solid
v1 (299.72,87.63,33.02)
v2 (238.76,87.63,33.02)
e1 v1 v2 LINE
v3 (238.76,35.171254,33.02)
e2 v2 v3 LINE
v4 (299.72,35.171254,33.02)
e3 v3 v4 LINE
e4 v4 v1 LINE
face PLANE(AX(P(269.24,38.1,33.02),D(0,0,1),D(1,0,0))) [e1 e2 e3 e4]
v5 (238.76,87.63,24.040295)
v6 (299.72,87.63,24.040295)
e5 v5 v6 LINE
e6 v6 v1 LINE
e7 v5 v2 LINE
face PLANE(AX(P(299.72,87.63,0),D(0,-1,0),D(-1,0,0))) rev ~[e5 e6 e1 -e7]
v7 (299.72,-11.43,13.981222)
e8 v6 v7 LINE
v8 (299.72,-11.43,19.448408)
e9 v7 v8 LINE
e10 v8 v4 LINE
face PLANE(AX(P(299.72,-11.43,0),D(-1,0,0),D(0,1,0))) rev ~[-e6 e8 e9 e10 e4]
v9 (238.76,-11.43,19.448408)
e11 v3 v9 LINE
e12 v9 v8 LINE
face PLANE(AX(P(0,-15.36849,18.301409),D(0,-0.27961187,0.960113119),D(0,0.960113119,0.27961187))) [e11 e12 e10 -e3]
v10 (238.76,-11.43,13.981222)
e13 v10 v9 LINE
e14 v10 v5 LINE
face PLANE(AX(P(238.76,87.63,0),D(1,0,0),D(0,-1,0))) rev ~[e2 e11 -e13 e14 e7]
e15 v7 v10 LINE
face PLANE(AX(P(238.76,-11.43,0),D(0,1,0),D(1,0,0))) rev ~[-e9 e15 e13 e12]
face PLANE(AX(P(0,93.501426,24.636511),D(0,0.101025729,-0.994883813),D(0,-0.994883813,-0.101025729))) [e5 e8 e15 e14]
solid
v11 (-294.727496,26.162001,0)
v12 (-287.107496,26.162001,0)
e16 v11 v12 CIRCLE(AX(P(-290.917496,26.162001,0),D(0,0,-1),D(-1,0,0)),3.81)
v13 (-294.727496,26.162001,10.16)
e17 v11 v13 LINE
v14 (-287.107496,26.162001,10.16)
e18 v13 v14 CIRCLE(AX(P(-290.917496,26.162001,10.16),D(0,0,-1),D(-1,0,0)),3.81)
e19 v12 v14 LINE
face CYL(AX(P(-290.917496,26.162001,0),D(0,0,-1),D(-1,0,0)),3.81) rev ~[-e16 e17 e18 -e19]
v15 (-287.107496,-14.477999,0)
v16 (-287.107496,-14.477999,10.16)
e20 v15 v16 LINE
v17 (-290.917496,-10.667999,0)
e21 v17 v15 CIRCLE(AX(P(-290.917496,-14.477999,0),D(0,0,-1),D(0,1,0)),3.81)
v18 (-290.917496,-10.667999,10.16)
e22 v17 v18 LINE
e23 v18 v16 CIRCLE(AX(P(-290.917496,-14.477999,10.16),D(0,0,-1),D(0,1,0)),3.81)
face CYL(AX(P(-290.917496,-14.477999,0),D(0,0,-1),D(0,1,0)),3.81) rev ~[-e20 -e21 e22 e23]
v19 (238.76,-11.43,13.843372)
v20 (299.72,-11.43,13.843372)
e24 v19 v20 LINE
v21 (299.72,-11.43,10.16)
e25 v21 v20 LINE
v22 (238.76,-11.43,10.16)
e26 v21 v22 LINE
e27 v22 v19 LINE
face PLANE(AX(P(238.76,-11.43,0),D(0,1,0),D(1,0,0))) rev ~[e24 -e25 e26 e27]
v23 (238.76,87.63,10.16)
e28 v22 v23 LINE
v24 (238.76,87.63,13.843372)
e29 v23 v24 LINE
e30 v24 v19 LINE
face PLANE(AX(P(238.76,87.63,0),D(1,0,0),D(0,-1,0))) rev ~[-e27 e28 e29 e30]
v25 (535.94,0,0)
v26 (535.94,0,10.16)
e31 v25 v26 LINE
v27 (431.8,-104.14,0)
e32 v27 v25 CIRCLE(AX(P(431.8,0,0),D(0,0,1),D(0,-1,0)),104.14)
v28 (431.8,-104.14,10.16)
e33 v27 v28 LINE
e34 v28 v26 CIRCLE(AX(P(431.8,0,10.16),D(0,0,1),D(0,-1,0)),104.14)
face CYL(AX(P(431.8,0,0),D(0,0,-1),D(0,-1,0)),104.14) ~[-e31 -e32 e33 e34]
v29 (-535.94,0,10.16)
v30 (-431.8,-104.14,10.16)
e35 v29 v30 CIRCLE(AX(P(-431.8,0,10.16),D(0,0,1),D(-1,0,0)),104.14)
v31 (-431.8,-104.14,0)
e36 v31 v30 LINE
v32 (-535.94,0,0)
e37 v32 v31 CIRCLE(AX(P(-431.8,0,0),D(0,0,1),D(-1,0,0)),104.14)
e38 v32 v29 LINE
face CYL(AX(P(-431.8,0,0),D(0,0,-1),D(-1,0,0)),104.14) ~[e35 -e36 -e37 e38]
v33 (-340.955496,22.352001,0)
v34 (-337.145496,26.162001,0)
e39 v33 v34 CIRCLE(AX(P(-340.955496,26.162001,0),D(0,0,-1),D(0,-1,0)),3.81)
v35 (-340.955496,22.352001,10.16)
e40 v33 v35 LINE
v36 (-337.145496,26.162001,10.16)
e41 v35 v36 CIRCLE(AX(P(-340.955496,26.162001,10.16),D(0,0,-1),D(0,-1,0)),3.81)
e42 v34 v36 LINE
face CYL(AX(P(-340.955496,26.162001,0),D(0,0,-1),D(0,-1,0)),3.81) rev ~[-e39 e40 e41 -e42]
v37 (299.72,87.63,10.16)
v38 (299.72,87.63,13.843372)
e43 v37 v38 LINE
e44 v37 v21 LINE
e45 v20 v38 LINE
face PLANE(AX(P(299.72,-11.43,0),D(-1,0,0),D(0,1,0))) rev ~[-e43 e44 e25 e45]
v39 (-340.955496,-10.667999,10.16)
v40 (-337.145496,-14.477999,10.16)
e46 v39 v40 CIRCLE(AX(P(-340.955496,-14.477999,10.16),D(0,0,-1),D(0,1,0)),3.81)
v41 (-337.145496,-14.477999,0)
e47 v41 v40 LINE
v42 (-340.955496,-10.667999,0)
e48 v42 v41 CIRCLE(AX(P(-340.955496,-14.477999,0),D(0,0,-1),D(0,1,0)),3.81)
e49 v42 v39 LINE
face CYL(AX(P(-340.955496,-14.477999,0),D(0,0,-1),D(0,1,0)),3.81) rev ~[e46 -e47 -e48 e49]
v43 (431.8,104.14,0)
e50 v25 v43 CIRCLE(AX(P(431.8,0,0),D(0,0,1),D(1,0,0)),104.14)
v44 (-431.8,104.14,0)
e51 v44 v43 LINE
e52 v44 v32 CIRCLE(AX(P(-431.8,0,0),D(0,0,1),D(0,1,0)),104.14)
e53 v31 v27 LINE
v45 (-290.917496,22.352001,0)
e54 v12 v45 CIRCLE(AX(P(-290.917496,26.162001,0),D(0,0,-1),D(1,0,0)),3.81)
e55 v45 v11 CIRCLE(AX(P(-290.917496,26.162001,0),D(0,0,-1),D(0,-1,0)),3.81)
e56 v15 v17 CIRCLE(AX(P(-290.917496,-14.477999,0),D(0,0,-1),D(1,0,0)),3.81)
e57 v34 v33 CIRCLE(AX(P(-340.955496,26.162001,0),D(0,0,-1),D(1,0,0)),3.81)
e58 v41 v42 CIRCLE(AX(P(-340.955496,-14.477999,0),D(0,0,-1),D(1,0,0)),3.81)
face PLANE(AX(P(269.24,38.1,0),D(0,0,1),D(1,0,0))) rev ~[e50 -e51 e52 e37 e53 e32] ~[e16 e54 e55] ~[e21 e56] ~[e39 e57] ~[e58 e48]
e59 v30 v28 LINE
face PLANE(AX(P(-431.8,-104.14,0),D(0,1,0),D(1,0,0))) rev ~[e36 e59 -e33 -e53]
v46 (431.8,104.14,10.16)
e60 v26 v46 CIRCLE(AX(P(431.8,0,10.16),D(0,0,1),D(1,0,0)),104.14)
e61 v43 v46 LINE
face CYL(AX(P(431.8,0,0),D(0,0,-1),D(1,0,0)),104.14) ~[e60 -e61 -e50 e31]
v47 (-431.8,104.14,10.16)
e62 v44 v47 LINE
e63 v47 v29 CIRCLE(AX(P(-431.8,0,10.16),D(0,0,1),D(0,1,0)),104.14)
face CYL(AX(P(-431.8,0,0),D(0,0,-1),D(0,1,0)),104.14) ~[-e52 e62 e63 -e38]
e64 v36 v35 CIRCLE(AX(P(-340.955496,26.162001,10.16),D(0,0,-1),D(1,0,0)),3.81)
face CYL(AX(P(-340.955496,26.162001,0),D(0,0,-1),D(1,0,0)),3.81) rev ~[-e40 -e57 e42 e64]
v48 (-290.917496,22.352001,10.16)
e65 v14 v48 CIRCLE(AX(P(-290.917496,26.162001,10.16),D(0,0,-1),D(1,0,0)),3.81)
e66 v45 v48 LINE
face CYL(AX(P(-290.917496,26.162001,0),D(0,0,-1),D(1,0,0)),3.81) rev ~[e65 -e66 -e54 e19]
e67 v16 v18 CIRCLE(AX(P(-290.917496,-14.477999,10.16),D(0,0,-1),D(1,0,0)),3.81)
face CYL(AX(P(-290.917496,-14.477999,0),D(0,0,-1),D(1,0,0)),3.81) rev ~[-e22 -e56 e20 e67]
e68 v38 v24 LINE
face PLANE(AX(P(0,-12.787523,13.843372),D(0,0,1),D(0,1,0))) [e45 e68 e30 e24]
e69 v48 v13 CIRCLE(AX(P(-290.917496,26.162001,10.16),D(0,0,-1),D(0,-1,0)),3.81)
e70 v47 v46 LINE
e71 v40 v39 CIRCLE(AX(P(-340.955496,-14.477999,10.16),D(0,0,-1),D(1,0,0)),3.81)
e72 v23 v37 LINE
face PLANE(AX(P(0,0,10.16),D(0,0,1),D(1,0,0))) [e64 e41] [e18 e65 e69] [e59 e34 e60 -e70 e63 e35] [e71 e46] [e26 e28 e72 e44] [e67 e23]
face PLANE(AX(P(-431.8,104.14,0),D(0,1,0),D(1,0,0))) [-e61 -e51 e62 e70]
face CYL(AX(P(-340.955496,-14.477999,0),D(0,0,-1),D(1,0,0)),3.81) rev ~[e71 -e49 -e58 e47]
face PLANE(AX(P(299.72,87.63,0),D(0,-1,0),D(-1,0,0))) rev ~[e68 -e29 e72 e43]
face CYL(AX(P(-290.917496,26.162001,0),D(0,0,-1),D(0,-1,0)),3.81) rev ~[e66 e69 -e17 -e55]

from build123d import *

# Parameters (mm, degrees)
F0_W     = 863.6
F0_H     = 208.28
F1_DEPTH = 10.16
F3_DEPTH = 33.02
F5_DEPTH = 734.06
F6_DEPTH = 548.64


# Not quite as in the source:
# - a feature names something its author has since deleted; it is built from what else it names


with BuildPart() as f1:
    # F0 (on Top) → F1 (new body)
    with BuildSketch(Plane.XY):
        Rectangle(F0_W, F0_H)
        with BuildLine():
            ThreePointArc((-337.1454958344, -14.4779989496), (-343.6495726707, -17.1720757859), (-340.9554958344, -10.6679989496))
            ThreePointArc((-340.9554958344, -10.6679989496), (-338.261418998, -11.7839221133), (-337.1454958344, -14.4779989496))
        make_face(mode=Mode.SUBTRACT)
        with BuildLine():
            ThreePointArc((-287.1074958344, -14.4779989496), (-293.6115726707, -17.1720757859), (-290.9174958344, -10.6679989496))
            ThreePointArc((-290.9174958344, -10.6679989496), (-288.223418998, -11.7839221133), (-287.1074958344, -14.4779989496))
        make_face(mode=Mode.SUBTRACT)
        with BuildLine():
            ThreePointArc((-340.9554958344, 22.3520010504), (-343.6495726707, 28.8560778867), (-337.1454958344, 26.1620010504))
            ThreePointArc((-337.1454958344, 26.1620010504), (-338.261418998, 23.4679242141), (-340.9554958344, 22.3520010504))
        make_face(mode=Mode.SUBTRACT)
        with BuildLine():
            ThreePointArc((-290.9174958344, 22.3520010504), (-293.6115726707, 23.4679242141), (-294.7274958344, 26.1620010504))
            ThreePointArc((-294.7274958344, 26.1620010504), (-290.9174958344, 29.9720010504), (-287.1074958344, 26.1620010504))
            ThreePointArc((-287.1074958344, 26.1620010504), (-288.223418998, 23.4679242141), (-290.9174958344, 22.3520010504))
        make_face(mode=Mode.SUBTRACT)
        with BuildLine():
            ThreePointArc((-535.94, 0), (-505.4381001928, -73.6381001928), (-431.8, -104.14))
            Line((-431.8, -104.14), (-431.8, 104.14))
            ThreePointArc((-431.8, 104.14), (-505.4381001928, 73.6381001928), (-535.94, 0))
        make_face()
        with BuildLine():
            Line((431.8, 104.14), (431.8, -104.14))
            ThreePointArc((431.8, -104.14), (505.4381001928, -73.6381001928), (535.94, 0))
            ThreePointArc((535.94, 0), (505.4381001928, 73.6381001928), (431.8, 104.14))
        make_face()
    extrude(amount=F1_DEPTH)

    # F2 (on Top) → F3 (join)
    with BuildSketch(Plane.XY):
        Polygon((238.76, -11.43), (299.72, -11.43), (299.72, 87.63), (238.76, 87.63), (238.76, 0), align=None)
    extrude(amount=F3_DEPTH)

    # F4 (on Right) → F5 (cut)
    with BuildSketch(Plane.YZ):
        Polygon((-16.7762897909, 37.7759821713), (-15.3684904799, 18.3014087379), (51.5020377934, 37.7759821713), align=None)
        Polygon((93.5014262795, 24.6365107596), (-12.7875227481, 13.8433724642), (93.5014262795, 13.8433724642), align=None)
    extrude(amount=F5_DEPTH, mode=Mode.SUBTRACT)

    # F0 (on Top) → F6 (cut)
    with BuildSketch(Plane.XY):
        Rectangle(F0_W, F0_H)
        with BuildLine():
            ThreePointArc((-337.1454958344, -14.4779989496), (-343.6495726707, -17.1720757859), (-340.9554958344, -10.6679989496))
            ThreePointArc((-340.9554958344, -10.6679989496), (-338.261418998, -11.7839221133), (-337.1454958344, -14.4779989496))
        make_face(mode=Mode.SUBTRACT)
        with BuildLine():
            ThreePointArc((-287.1074958344, -14.4779989496), (-293.6115726707, -17.1720757859), (-290.9174958344, -10.6679989496))
            ThreePointArc((-290.9174958344, -10.6679989496), (-288.223418998, -11.7839221133), (-287.1074958344, -14.4779989496))
        make_face(mode=Mode.SUBTRACT)
        with BuildLine():
            ThreePointArc((-340.9554958344, 22.3520010504), (-343.6495726707, 28.8560778867), (-337.1454958344, 26.1620010504))
            ThreePointArc((-337.1454958344, 26.1620010504), (-338.261418998, 23.4679242141), (-340.9554958344, 22.3520010504))
        make_face(mode=Mode.SUBTRACT)
        with BuildLine():
            ThreePointArc((-290.9174958344, 22.3520010504), (-293.6115726707, 23.4679242141), (-294.7274958344, 26.1620010504))
            ThreePointArc((-294.7274958344, 26.1620010504), (-290.9174958344, 29.9720010504), (-287.1074958344, 26.1620010504))
            ThreePointArc((-287.1074958344, 26.1620010504), (-288.223418998, 23.4679242141), (-290.9174958344, 22.3520010504))
        make_face(mode=Mode.SUBTRACT)
        with BuildLine():
            ThreePointArc((-535.94, 0), (-505.4381001928, -73.6381001928), (-431.8, -104.14))
            Line((-431.8, -104.14), (-431.8, 104.14))
            ThreePointArc((-431.8, 104.14), (-505.4381001928, 73.6381001928), (-535.94, 0))
        make_face()
        with BuildLine():
            Line((431.8, 104.14), (431.8, -104.14))
            ThreePointArc((431.8, -104.14), (505.4381001928, -73.6381001928), (535.94, 0))
            ThreePointArc((535.94, 0), (505.4381001928, 73.6381001928), (431.8, 104.14))
        make_face()
    extrude(amount=-F6_DEPTH, mode=Mode.SUBTRACT)


solid = f1.part
